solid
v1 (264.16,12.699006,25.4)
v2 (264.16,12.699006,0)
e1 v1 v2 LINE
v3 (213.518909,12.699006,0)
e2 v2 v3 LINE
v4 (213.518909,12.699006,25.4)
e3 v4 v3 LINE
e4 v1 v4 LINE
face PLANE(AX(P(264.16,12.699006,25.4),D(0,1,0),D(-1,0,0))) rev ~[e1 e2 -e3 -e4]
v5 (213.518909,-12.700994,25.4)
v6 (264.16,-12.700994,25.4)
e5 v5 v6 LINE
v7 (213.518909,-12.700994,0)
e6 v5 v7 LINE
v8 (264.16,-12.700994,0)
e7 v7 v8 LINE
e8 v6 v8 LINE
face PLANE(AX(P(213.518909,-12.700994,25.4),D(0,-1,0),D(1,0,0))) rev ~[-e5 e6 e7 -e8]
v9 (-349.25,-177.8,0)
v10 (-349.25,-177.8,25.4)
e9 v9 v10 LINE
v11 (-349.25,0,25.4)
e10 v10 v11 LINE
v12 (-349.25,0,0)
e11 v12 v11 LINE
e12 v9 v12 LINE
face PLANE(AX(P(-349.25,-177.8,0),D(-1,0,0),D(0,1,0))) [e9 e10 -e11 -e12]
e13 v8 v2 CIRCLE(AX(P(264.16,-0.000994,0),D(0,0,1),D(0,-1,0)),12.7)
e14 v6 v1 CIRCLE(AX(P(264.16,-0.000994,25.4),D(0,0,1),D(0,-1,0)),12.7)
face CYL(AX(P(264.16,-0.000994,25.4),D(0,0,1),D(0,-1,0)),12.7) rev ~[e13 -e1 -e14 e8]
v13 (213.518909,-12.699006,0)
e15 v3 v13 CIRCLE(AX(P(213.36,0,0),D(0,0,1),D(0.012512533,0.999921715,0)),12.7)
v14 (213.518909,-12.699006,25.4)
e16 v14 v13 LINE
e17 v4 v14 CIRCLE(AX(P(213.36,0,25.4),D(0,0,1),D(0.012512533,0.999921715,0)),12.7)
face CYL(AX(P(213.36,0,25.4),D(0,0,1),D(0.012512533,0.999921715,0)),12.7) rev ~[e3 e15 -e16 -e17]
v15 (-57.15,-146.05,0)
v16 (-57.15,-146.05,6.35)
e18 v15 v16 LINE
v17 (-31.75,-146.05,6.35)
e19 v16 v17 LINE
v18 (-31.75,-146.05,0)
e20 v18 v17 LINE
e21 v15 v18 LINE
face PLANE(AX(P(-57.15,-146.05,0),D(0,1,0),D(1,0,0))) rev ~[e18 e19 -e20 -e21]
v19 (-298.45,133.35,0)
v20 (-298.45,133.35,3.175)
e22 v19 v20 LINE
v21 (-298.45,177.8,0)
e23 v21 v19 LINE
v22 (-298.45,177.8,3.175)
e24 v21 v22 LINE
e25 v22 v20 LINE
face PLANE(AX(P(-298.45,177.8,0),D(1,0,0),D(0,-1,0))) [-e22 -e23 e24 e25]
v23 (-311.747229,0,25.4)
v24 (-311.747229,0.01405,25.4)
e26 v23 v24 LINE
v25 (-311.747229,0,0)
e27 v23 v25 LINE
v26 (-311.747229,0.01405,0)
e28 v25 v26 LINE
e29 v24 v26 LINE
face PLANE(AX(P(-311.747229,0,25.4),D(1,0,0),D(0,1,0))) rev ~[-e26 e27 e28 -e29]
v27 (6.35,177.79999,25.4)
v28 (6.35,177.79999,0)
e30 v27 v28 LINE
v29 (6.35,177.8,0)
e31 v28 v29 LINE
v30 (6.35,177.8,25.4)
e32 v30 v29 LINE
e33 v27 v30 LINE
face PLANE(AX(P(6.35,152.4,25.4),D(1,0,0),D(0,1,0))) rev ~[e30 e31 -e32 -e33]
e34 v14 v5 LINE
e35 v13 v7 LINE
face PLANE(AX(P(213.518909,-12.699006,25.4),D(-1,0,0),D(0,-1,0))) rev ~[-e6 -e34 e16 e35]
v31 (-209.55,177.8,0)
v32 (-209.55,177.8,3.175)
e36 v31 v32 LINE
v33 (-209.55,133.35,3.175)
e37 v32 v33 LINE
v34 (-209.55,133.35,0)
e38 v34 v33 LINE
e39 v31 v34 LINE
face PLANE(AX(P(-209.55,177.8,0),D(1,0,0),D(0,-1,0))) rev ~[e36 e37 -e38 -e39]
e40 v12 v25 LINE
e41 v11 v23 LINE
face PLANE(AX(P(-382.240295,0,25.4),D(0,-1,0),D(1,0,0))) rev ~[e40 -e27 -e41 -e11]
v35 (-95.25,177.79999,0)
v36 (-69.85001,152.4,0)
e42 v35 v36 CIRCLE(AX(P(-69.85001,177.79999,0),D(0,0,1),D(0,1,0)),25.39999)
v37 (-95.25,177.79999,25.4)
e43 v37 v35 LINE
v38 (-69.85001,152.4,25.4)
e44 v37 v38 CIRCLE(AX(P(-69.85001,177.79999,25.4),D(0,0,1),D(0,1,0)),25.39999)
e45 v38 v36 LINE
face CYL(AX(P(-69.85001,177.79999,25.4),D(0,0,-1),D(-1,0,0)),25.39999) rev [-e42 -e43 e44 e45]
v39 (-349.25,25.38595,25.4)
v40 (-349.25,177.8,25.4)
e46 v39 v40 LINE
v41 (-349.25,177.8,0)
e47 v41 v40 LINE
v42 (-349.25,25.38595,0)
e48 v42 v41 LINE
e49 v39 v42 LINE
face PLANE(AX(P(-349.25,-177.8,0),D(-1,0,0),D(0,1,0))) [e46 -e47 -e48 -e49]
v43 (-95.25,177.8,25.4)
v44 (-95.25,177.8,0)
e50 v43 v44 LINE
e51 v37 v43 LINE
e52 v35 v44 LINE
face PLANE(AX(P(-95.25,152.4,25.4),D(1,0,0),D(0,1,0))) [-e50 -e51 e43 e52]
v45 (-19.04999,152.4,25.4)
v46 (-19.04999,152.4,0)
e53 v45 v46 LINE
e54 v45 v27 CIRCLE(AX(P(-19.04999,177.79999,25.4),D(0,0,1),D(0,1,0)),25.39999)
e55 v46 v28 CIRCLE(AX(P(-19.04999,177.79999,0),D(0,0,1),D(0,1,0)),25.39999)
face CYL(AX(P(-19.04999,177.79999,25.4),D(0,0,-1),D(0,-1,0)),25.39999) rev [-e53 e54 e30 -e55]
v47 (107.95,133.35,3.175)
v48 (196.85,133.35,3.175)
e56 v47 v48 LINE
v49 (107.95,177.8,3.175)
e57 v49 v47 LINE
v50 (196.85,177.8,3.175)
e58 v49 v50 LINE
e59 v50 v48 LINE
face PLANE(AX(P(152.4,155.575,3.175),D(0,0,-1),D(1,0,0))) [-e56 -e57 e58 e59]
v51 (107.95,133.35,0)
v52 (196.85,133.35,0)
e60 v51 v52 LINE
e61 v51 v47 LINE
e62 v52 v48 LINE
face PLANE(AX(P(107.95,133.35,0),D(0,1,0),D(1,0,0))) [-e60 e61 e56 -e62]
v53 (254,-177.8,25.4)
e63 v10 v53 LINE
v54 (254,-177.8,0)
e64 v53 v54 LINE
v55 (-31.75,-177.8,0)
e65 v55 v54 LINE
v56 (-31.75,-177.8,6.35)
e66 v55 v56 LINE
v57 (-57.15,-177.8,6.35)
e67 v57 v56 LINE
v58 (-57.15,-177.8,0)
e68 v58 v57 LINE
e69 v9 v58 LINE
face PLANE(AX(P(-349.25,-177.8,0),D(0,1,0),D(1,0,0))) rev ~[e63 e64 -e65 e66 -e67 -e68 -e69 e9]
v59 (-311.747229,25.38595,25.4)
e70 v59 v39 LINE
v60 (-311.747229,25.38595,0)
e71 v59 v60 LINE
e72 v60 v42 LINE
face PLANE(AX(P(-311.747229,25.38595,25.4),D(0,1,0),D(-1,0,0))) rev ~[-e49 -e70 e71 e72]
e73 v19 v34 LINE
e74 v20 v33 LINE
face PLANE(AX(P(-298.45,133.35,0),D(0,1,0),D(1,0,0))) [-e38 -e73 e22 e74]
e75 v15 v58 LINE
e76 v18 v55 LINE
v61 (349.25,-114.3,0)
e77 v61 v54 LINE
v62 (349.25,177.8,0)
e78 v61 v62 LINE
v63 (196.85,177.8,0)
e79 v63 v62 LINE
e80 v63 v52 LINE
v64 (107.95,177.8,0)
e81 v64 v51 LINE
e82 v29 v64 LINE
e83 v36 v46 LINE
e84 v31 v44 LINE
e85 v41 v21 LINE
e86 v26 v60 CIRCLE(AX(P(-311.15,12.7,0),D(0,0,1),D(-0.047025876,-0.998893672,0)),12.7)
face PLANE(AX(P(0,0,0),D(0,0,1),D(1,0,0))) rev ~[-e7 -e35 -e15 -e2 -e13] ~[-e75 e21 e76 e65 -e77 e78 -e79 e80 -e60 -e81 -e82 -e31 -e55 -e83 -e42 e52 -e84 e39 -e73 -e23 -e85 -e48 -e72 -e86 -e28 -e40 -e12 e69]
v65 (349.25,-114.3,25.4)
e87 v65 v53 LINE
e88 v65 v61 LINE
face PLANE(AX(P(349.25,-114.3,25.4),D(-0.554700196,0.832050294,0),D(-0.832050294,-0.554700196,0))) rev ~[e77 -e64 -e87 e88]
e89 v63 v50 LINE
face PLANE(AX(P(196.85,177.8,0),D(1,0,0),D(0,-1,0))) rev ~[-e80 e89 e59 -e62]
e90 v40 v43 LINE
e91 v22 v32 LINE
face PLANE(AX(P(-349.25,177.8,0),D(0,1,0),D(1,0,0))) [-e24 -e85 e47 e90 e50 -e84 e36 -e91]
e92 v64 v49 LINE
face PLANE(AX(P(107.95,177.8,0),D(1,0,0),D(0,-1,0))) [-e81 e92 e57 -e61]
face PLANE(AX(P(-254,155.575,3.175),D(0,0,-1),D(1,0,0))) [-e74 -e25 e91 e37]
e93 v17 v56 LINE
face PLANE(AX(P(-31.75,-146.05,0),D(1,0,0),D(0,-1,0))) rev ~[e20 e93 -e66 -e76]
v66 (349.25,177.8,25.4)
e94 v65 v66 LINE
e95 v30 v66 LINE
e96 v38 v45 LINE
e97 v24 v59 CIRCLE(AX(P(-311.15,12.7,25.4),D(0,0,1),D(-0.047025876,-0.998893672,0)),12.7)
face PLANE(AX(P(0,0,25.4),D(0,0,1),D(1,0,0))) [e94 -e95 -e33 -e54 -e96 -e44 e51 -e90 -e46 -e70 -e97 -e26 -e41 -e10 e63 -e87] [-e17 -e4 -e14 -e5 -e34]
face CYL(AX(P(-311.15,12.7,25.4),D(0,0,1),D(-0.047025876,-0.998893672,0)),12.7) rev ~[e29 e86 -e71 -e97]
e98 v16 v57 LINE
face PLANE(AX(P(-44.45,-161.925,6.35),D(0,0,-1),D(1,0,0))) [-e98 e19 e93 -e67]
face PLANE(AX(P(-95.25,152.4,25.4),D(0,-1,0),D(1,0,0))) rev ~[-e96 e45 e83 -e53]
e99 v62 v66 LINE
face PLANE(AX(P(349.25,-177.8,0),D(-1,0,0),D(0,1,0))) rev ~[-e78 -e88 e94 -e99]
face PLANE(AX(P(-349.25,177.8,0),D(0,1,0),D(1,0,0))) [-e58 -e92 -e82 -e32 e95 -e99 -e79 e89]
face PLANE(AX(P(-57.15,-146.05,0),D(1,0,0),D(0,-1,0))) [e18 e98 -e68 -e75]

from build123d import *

# Parameters (mm, degrees)
F0_W      = 698.5
F0_H      = 355.6
F1_DEPTH  = 25.4
F3_DEPTH  = 25.401
F4_W      = 88.9
F4_H      = 44.45
F5_DEPTH  = 3.175
F7_DEPTH  = 25.401
F8_W      = 101.6
F8_H      = 25.4
F9_DEPTH  = 25.4
F10_R     = 25.39999
F11_W     = 25.4
F11_H     = 31.75
F12_DEPTH = 6.35


# Not quite as in the source:
# - a fillet or chamfer is up to 0.001 mm smaller than in the source, because OpenCascade refuses the exact size
# - a feature names something its author has since deleted; it is built from what else it names


with BuildPart() as f1:
    # F0 (on Top) → F1 (new body)
    with BuildSketch(Plane.XY):
        Rectangle(F0_W, F0_H)
    extrude(amount=F1_DEPTH)

    # F2 (on face) → F3 (cut, through all)
    with BuildSketch(Plane.XY.offset(25.4)):
        Polygon((349.25, -114.3), (254, -177.8), (349.25, -177.8), align=None)
    extrude(amount=-F3_DEPTH, mode=Mode.SUBTRACT)

    # F4 (on face) → F5 (cut)
    with BuildSketch(Plane(origin=(0, 0, 0), x_dir=(1, 0, 0), z_dir=(0, 0, -1))):
        with Locations((-254, -155.575)):
            Rectangle(F4_W, F4_H)
        with Locations((152.4, -155.575)):
            Rectangle(F4_W, F4_H)
    extrude(amount=-F5_DEPTH, mode=Mode.SUBTRACT)

    # F6 (on face) → F7 (cut, through all)
    with BuildSketch(Plane.XY.offset(25.4)):
        with BuildLine():
            Line((-311.747228622, 0), (-311.747228622, 0.0140503716))
            ThreePointArc((-311.747228622, 0.0140503716), (-298.45, 12.7), (-311.747228622, 25.3859496284))
            Line((-311.747228622, 25.3859496284), (-382.2402954102, 25.3859496284))
            Line((-382.2402954102, 25.3859496284), (-382.2402954102, 0))
            Line((-382.2402954102, 0), (-311.747228622, 0))
        make_face()
        with BuildLine():
            Line((264.16, 12.6990057829), (213.5189091712, 12.6990057829))
            ThreePointArc((213.5189091712, 12.6990057829), (200.66, 0), (213.5189091712, -12.6990057829))
            Line((213.5189091712, -12.6990057829), (213.5189091712, -12.7009942171))
            Line((213.5189091712, -12.7009942171), (264.16, -12.7009942171))
            ThreePointArc((264.16, -12.7009942171), (276.86, -0.0009942171), (264.16, 12.6990057829))
        make_face()
    extrude(amount=-F7_DEPTH, mode=Mode.SUBTRACT)

    # F8 (on face) → F9 (cut)
    with BuildSketch(Plane.XY.offset(25.4)):
        with Locations((-44.45, 165.1)):
            Rectangle(F8_W, F8_H)
    extrude(amount=-F9_DEPTH, mode=Mode.SUBTRACT)

    # F10 (radius 25.4 in the source; OpenCascade refuses exactly that, so slightly less here)
    f10_edges = [f1.edges().sort_by_distance(p)[0] for p in [
        (-95.25, 152.4, 12.7),
        (6.35, 152.4, 12.7),
    ]]
    fillet(f10_edges, radius=F10_R)

    # F11 (on face) → F12 (cut)
    with BuildSketch(Plane(origin=(0, 0, 0), x_dir=(1, 0, 0), z_dir=(0, 0, -1))):
        with Locations((-44.45, 161.925)):
            Rectangle(F11_W, F11_H)
    extrude(amount=-F12_DEPTH, mode=Mode.SUBTRACT)


solid = f1.part
